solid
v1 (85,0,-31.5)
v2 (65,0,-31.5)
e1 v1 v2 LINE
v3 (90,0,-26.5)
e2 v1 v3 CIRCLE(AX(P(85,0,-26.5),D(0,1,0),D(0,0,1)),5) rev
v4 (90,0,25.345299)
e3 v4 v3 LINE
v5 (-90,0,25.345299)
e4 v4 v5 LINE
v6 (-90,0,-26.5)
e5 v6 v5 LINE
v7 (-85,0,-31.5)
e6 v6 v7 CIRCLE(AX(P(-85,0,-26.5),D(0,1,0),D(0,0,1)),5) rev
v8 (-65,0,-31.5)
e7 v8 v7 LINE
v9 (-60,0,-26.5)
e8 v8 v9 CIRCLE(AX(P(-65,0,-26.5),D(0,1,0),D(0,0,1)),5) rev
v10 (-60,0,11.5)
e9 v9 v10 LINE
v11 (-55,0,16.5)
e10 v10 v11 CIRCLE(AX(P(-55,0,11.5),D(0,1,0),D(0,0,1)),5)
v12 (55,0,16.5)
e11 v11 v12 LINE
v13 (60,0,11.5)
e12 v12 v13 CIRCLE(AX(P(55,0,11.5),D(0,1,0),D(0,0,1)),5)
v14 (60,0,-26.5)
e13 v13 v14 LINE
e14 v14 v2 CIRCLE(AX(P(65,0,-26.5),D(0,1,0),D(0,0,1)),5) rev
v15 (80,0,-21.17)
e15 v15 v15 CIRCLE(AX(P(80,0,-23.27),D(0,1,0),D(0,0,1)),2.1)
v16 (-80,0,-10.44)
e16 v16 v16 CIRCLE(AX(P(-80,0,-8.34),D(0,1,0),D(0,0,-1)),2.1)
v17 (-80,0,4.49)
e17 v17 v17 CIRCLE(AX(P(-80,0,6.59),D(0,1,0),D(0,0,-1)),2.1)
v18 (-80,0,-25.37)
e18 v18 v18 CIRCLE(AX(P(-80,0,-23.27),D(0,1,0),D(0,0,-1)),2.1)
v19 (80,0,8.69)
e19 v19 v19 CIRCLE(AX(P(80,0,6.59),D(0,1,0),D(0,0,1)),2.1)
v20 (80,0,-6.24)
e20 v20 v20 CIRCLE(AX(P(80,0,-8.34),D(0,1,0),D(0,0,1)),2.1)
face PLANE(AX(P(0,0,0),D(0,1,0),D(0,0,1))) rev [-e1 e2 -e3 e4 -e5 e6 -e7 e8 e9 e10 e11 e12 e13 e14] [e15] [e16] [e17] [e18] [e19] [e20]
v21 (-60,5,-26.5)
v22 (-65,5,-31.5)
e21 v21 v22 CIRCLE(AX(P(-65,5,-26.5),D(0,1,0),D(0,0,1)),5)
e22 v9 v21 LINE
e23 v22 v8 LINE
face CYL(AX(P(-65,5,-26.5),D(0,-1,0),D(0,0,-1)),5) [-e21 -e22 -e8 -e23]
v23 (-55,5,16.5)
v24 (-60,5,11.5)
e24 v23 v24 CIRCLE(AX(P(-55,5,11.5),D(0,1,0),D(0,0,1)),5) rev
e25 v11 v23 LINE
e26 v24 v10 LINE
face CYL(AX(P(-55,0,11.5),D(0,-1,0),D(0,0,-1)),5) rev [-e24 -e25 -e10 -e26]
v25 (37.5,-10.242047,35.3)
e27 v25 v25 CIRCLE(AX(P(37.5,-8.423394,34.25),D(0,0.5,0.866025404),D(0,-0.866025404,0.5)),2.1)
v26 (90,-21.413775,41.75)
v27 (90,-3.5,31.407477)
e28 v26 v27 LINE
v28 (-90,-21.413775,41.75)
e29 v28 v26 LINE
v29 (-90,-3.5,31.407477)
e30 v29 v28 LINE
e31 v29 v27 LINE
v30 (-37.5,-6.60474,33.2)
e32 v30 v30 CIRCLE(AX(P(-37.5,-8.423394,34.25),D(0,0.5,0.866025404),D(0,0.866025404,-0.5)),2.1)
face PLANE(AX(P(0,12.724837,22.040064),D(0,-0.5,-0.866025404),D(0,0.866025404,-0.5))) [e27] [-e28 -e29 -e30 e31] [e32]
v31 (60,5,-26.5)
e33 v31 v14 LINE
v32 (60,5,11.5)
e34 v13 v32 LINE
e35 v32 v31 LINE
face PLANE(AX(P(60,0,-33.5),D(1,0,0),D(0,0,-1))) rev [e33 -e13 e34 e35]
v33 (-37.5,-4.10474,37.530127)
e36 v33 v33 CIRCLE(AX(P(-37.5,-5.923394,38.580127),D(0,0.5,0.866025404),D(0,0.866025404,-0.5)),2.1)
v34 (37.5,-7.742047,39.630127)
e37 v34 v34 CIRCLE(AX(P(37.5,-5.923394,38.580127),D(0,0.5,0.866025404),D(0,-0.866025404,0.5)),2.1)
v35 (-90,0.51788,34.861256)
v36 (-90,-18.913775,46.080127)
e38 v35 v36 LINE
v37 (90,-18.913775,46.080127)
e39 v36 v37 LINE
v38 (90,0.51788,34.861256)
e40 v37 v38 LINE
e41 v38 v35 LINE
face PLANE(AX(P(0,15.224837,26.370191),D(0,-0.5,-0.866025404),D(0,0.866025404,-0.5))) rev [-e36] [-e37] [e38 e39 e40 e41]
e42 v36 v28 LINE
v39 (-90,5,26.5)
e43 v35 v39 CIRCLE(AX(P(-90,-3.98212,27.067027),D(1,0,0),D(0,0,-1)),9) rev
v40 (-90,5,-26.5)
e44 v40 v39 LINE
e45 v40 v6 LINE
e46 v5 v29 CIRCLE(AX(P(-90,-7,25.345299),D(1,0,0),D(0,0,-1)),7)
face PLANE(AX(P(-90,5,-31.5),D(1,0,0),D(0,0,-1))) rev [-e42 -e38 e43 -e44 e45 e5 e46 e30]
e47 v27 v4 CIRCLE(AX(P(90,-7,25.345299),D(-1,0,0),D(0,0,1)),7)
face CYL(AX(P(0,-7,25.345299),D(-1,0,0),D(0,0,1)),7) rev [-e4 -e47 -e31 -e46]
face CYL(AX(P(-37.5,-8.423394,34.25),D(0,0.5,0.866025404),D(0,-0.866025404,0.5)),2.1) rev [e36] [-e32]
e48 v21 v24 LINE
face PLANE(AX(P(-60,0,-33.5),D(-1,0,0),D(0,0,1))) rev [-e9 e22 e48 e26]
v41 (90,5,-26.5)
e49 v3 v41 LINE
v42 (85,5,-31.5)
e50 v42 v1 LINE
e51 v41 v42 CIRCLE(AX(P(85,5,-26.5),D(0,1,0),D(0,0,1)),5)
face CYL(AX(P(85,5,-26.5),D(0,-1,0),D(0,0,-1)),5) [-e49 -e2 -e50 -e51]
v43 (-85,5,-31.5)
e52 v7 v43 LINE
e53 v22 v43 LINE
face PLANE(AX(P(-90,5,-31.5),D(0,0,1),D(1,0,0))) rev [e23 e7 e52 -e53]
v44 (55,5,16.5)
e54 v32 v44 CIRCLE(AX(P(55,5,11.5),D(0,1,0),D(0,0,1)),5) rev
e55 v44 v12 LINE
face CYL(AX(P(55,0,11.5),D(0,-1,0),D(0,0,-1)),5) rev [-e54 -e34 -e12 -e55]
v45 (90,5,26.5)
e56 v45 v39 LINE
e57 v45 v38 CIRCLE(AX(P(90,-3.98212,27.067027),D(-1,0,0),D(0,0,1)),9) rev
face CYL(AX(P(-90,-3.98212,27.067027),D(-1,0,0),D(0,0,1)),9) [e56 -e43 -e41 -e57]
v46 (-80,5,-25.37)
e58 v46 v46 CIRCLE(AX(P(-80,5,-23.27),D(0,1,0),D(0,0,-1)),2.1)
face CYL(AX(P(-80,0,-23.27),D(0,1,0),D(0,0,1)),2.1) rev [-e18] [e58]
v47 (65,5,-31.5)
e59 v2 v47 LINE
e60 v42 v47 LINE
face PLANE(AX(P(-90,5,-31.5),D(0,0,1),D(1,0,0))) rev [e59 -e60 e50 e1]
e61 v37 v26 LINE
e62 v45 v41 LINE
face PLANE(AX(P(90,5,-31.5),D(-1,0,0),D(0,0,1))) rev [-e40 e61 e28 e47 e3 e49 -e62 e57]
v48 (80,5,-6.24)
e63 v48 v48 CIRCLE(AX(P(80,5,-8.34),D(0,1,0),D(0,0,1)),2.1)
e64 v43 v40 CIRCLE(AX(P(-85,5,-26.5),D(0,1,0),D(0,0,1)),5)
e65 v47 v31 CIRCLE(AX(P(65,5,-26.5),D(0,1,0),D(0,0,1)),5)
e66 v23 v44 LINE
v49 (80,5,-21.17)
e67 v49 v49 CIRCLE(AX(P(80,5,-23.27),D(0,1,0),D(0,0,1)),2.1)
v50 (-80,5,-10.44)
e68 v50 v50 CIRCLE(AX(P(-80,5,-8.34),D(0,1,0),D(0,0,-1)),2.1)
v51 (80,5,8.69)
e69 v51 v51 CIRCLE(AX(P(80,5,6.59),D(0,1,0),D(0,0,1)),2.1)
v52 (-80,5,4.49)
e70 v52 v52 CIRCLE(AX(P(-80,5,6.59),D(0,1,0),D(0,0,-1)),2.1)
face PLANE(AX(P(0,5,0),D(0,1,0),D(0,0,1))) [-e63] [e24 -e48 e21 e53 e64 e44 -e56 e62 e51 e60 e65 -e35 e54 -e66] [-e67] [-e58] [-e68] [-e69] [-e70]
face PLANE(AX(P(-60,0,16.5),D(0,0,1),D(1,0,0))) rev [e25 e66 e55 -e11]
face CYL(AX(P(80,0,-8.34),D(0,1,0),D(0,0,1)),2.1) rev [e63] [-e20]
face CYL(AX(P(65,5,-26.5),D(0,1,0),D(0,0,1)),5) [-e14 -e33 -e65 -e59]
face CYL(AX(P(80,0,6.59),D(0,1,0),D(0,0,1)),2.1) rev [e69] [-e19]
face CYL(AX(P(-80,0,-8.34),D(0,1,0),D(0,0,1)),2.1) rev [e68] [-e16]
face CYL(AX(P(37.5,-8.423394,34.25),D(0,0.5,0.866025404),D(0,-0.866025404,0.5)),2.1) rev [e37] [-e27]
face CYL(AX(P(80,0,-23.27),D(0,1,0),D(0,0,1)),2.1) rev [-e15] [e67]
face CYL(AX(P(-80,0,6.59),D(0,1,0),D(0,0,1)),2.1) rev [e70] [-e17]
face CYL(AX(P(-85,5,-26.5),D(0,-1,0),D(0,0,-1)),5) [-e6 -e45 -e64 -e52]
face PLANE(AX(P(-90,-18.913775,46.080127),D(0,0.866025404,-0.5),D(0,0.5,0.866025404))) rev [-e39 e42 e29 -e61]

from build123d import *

# Parameters (mm, degrees)
SKETCH_1_W          = 180
SKETCH_1_H          = 63
EXTRUDE_1_DEPTH     = 5
SKETCH_2_R          = 2.1
CUT_EXTRUDE_1_DEPTH = 5
CUT_EXTRUDE_2_DEPTH = 200
SKETCH_5_W          = 180
SKETCH_5_H          = 30.5
EXTRUDE_2_DEPTH     = 5
SKETCH_7_R          = 2.1
CUT_EXTRUDE_3_DEPTH = 5
FILLET_3_R          = 9
FILLET_4_R          = 7
SKETCH_8_W          = 120
SKETCH_8_H          = 50
CUT_EXTRUDE_4_DEPTH = 5
FILLET_5_R          = 5


with BuildPart() as part:
    # 草图1 → 凸台-拉伸1 (new body)
    with BuildSketch(Plane(origin=(0, 0, 0), x_dir=(1, 0, 0), z_dir=(0, 1, 0))):
        Rectangle(SKETCH_1_W, SKETCH_1_H)
    extrude(amount=EXTRUDE_1_DEPTH)

    # 草图2 → 切除-拉伸1 (cut)
    with BuildSketch(Plane(origin=(0, 5, 0), x_dir=(1, 0, 0), z_dir=(0, 1, 0))):
        with Locations(Location((80, 23.27, 0), (0, 0, 270))):
            Circle(SKETCH_2_R)
        with Locations(Location((80, 8.34, 0), (0, 0, 270))):
            Circle(SKETCH_2_R)
        with Locations(Location((80, -6.59, 0), (0, 0, 270))):
            Circle(SKETCH_2_R)
        with Locations(Location((-80, 23.27, 0), (0, 0, 90))):
            Circle(SKETCH_2_R)
        with Locations(Location((-80, 8.34, 0), (0, 0, 90))):
            Circle(SKETCH_2_R)
        with Locations(Location((-80, -6.59, 0), (0, 0, 90))):
            Circle(SKETCH_2_R)
    extrude(amount=-CUT_EXTRUDE_1_DEPTH, mode=Mode.SUBTRACT)

    # 草图3 → 切除-拉伸2 (cut)
    with BuildSketch(Plane.ZY.offset(90)):
        Polygon((26.5, 5), (29.386751346, 0), (31.5, 0), (31.5, 5), align=None)
    extrude(amount=-CUT_EXTRUDE_2_DEPTH, mode=Mode.SUBTRACT)

    # 草图5 → 凸台-拉伸2 (add)
    with BuildSketch(Plane(origin=(0, 12.7248366, 22.040063509), x_dir=(1, 0, 0), z_dir=(0, 0.49999999999999806, 0.8660254037844399))):
        with Locations((0, -24.169872981)):
            Rectangle(SKETCH_5_W, SKETCH_5_H)
    extrude(amount=EXTRUDE_2_DEPTH)

    # 草图7 → 切除-拉伸3 (cut)
    with BuildSketch(Plane(origin=(0, 15.2248366, 26.370190528), x_dir=(1, 0, 0), z_dir=(0, 0.4999999999999981, 0.8660254037844397))):
        with Locations(Location((37.5, -24.419872981, 0), (0, 0, 270))):
            Circle(SKETCH_7_R)
        with Locations(Location((-37.5, -24.419872981, 0), (0, 0, 90))):
            Circle(SKETCH_7_R)
    extrude(amount=-CUT_EXTRUDE_3_DEPTH, mode=Mode.SUBTRACT)

    # 圆角3
    # the kernel refuses this fillet: 9 mm, written as the material it takes off along each edge
    with BuildSketch(Plane(origin=(110.155644371, 7.5, 30.830127019), x_dir=(0, -0.8660254037844398, 0.499999999999998), z_dir=(-1, 0, 0))) as fillet_3_piece_1:
        with BuildLine():
            CenterArc((8.062257748, -9), FILLET_3_R, 90, 63.612200039)
            Line((0, -5), (-0.161245155, -4.92))
            ThreePointArc((-0.161245155, -4.92), (-0.18, -2.5), (-0.18, 0))
            Line((-0.18, 0), (0, 0.18))
            Line((0, 0.18), (8.062257748, 0.18))
            Line((8.062257748, 0.18), (8.062257748, 0))
        make_face()
    extrude(amount=220.311288741, mode=Mode.SUBTRACT)

    # 圆角4
    fillet_4_edges = [part.edges().sort_by_distance(p)[0] for p in [
        (0, 0, 29.386751346),
    ]]
    fillet(fillet_4_edges, radius=FILLET_4_R)

    # 草图8 → 切除-拉伸4 (cut)
    with BuildSketch(Plane(origin=(0, 5, 0), x_dir=(1, 0, 0), z_dir=(0, 1, 0))):
        with Locations((0, 8.5)):
            Rectangle(SKETCH_8_W, SKETCH_8_H)
    extrude(amount=-CUT_EXTRUDE_4_DEPTH, mode=Mode.SUBTRACT)

    # 圆角5
    fillet_5_edges = [part.edges().sort_by_distance(p)[0] for p in [
        (60, 2.5, -31.5),
        (-60, 2.5, -31.5),
        (-60, 2.5, 16.5),
        (60, 2.5, 16.5),
        (-90, 2.5, -31.5),
        (90, 2.5, -31.5),
    ]]
    fillet(fillet_5_edges, radius=FILLET_5_R)


solid = part.part
